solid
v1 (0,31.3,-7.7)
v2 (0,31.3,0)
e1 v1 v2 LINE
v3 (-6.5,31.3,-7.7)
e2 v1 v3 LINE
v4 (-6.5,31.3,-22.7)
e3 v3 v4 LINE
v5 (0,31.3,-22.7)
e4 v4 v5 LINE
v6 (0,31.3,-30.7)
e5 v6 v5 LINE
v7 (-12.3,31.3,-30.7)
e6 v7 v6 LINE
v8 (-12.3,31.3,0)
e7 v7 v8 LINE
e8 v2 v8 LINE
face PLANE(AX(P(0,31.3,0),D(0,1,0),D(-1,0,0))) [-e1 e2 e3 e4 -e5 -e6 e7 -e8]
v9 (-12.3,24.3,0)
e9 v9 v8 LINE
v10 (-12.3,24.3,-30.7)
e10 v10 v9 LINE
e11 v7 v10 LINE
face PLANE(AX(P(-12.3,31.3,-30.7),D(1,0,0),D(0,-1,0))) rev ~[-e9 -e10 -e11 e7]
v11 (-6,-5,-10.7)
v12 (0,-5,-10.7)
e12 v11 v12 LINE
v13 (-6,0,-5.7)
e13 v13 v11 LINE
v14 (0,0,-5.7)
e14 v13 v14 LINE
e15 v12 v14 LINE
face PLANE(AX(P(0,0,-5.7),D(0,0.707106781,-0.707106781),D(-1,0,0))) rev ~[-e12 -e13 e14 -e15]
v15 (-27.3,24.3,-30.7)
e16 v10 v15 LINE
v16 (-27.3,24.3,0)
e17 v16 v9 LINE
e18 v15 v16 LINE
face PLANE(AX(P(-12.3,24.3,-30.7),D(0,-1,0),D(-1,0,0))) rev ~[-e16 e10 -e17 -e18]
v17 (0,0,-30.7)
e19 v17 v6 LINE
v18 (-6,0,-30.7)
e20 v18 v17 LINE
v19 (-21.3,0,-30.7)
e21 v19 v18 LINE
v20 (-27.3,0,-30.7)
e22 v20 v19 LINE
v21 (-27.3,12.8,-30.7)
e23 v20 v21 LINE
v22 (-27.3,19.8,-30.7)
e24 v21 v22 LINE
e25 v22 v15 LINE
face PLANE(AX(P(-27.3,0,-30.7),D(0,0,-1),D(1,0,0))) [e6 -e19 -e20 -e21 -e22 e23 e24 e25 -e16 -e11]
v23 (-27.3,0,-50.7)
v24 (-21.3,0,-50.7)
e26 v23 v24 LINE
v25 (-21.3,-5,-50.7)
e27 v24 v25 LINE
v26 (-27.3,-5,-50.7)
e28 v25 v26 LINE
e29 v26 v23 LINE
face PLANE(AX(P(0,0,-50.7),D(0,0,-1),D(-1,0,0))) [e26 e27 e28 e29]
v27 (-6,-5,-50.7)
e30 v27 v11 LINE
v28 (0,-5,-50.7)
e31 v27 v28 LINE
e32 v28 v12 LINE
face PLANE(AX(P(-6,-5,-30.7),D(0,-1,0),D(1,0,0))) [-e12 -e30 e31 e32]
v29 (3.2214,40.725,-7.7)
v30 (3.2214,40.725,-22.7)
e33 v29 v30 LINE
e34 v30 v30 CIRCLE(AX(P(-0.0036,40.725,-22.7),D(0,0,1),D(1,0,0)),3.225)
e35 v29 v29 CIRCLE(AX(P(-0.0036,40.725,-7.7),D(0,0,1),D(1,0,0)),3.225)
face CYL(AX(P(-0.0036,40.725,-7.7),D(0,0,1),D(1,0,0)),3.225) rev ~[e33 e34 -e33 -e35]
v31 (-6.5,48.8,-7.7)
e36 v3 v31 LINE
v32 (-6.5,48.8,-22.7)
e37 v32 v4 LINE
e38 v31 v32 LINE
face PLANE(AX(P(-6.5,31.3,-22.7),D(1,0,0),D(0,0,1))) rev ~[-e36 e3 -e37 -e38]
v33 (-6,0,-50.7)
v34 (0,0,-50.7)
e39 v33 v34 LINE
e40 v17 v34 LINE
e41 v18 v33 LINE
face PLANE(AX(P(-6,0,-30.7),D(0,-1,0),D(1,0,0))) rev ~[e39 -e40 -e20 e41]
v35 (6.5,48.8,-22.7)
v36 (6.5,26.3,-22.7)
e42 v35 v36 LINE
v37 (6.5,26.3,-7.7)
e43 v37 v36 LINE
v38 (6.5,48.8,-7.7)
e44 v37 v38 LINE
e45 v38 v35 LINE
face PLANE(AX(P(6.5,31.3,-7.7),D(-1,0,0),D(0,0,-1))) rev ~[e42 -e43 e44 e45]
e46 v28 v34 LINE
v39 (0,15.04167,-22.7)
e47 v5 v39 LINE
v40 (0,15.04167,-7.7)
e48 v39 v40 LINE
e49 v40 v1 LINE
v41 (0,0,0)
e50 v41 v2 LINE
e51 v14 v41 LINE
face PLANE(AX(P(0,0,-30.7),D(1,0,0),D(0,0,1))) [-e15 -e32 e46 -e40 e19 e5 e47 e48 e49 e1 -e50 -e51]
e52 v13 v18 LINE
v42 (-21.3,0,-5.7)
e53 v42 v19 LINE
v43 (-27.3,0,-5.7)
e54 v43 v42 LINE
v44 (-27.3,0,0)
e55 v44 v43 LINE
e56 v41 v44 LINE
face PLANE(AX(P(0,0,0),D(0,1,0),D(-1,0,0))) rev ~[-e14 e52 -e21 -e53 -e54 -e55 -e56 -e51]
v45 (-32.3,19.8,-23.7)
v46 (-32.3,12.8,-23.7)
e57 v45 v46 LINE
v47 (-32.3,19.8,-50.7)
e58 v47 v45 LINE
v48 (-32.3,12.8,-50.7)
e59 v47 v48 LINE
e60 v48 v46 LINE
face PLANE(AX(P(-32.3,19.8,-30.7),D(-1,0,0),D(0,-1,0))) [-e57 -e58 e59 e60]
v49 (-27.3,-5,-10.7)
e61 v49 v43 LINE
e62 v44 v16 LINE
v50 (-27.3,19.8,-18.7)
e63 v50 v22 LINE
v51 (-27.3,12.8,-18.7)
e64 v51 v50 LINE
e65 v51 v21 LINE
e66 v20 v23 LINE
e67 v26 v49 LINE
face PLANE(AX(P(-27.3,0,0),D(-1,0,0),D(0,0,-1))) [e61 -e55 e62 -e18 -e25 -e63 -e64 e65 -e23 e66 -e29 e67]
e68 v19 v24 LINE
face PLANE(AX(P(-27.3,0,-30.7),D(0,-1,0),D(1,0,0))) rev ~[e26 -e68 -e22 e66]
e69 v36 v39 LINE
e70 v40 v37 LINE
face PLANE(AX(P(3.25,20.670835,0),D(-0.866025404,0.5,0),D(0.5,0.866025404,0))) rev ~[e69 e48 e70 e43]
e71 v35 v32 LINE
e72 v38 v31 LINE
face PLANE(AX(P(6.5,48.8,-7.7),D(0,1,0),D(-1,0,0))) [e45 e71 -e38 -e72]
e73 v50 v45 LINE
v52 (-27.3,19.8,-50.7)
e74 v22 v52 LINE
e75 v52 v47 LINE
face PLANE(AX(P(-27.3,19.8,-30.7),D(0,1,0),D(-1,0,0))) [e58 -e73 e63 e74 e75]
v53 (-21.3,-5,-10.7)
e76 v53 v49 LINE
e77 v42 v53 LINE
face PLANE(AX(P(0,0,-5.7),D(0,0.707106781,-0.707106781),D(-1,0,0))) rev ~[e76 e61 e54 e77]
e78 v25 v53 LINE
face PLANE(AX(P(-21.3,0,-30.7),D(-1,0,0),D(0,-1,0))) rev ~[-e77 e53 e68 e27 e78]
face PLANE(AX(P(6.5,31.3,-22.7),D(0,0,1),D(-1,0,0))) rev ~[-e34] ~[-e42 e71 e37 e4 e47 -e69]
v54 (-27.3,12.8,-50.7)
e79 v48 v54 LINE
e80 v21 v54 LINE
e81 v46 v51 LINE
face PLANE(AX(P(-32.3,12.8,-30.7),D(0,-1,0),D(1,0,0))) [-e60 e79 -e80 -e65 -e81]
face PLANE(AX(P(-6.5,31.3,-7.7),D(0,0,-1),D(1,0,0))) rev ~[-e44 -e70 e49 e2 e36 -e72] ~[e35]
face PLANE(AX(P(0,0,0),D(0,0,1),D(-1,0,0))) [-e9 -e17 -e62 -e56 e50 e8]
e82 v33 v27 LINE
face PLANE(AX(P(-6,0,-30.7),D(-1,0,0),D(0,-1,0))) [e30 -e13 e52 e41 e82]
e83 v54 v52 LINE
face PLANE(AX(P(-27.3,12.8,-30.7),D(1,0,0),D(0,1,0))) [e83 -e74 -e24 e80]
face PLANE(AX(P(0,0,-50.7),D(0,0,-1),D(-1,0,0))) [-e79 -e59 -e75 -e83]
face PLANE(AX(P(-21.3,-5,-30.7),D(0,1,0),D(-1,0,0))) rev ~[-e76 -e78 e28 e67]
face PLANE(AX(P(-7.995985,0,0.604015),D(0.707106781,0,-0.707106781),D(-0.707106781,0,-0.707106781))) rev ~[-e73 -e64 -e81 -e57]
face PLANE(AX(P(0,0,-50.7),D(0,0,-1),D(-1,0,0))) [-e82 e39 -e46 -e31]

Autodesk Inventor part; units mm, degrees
ref_plane "YZ Plane" through (0, 0, 0) normal (1, 0, 0) x (0, 1, 0)
ref_plane "XZ Plane" through (0, 0, 0) normal (0, 1, 0) x (-1, 0, 0)
ref_plane "XY Plane" through (0, 0, 0) normal (0, 0, 1) x (1, 0, 0)
sketch "Sketch1" plane through (0, 0, 0) normal (0, 1, 0) x (-1, 0, 0)
  line L0 (0, 0) -> (27.3, 0)
  line L1 (27.3, 0) -> (27.3, -30.7)
  line L2 (27.3, -30.7) -> (0, -30.7)
  line L3 (0, -30.7) -> (0, 0)
  dimension "d0" = 27.3
  dimension "d1" = 30.7
extrude "Extrusion1" add sketch "Sketch1" along normal blind 31.3
sketch "Sketch2" plane through (0, 31.3, 0) normal (0, 1, 0) x (1, 0, 0)
  line L0 (-27.3, 0) -> (0, 0) construction
  line L1 (0, 0) -> (0, 7.7) construction
  line L2 (-6.5, 7.7) -> (6.5, 7.7)
  line L3 (6.5, 7.7) -> (6.5, 22.7)
  line L4 (6.5, 22.7) -> (-6.5, 22.7)
  line L5 (-6.5, 22.7) -> (-6.5, 7.7)
  dimension "d4" = 7.7
  dimension "d5" = 13
  dimension "d6" = 15
extrude "Extrusion2" add sketch "Sketch2" along normal blind 20 and the other way blind 5
draft "FaceDraft1" angle 60 pull direction (1, 0, 0) faces at (2.1667, 26.3, -17.7) fixed edges at (6.5, 26.3, -15.2)
sketch "Sketch3" plane through (-6.5, 31.3, -7.7) normal (0, 0, 1) x (1, 0, 0)
  line L0 (6.5, 0) -> (0, 0) construction
  line L1 (0, 0) -> (0, 6.2) construction
  line L2 (0, 20) -> (0, 0) construction
  line L3 (0, 6.2) -> (12.9928, 6.2) construction
  circle A0 centre (6.4964, 9.425) radius 3.225
  line L4 (0, 20) -> (13, 20) projected
  line L5 (0, 20) -> (13, 20)
  line L6 (13, 20) -> (13, 17.5)
  line L7 (13, 17.5) -> (0, 17.5)
  line L8 (0, 17.5) -> (0, 20)
  point P0 (6.5, -31.3)
  point P1 (6.4964, 6.2)
  dimension "d13" = 6.45
  dimension "d12" = 6.2
  dimension "d14" = 2.5
extrude "Extrusion3" cut sketch "Sketch3" against normal through all
sketch "Sketch4" plane through (0, 0, -30.7) normal (0, 0, -1) x (-1, 0, 0)
  line L0 (27.3, 31.3) -> (0, 31.3) construction
  line L1 (27.3, 31.3) -> (27.3, 19.8) construction
  line L2 (27.3, 0) -> (27.3, 31.3) construction
  line L3 (27.3, 19.8) -> (32.3, 19.8)
  line L4 (32.3, 19.8) -> (32.3, 12.8)
  line L5 (32.3, 12.8) -> (27.3, 12.8)
  line L6 (27.3, 12.8) -> (27.3, 19.8)
  point P0 (0, 0)
  dimension "d17" = 11.5
  dimension "d18" = 5
  dimension "d19" = 7
extrude "Extrusion4" add sketch "Sketch4" along normal blind 20 and the other way blind 12
draft "FaceDraft2" angle 45 pull direction (-1, 0, 0) faces at (-30.6333, 15.1333, -18.7) fixed edges at (-27.3, 16.3, -18.7)
sketch "Sketch5" plane through (0, 0, -30.7) normal (0, 0, -1) x (-1, 0, 0)
  line L0 (27.3, 19.8) -> (27.3, 31.3) projected
  line L1 (27.3, 31.3) -> (12.3, 31.3)
  line L2 (12.3, 31.3) -> (12.3, 24.3)
  line L3 (12.3, 24.3) -> (27.3, 24.3)
  line L4 (27.3, 24.3) -> (27.3, 31.3)
  point P0 (0, 0)
  dimension "d25" = 15
  dimension "d26" = 7
extrude "Extrusion5" cut sketch "Sketch5" against normal through all
sketch "Sketch6" plane through (0, 0, -30.7) normal (0, 0, -1) x (-1, 0, 0)
  point P0 (0, 0)
sketch "Sketch7" plane through (0, 0, -30.7) normal (0, 0, -1) x (-1, 0, 0)
  point P0 (0, 0)
sketch "Sketch8" plane through (0, 0, -30.7) normal (0, 0, -1) x (-1, 0, 0)
  line L0 (27.3, 0) -> (0, 0) projected
  line L1 (27.3, 0) -> (21.3, 0)
  line L2 (21.3, 0) -> (21.3, -5)
  line L3 (21.3, -5) -> (27.3, -5)
  line L4 (27.3, -5) -> (27.3, 0)
  line L5 (0, 0) -> (6, 0)
  line L6 (6, 0) -> (6, -5)
  line L7 (6, -5) -> (0, -5)
  line L8 (0, -5) -> (0, 0)
  dimension "d29" = 6
  dimension "d30" = 5
  dimension "d31" = 6
  dimension "d32" = 5
extrude "Extrusion6" add sketch "Sketch8" along normal blind 20 and the other way blind 25
draft "FaceDraft3" angle 45 pull direction (0, -1, 0) faces at (-23.3, -3.3333, -5.7) (-2, -1.6667, -5.7) fixed edges at (-24.3, 0, -5.7) (-3, 0, -5.7)
properties part number "Y- motor carrier"
